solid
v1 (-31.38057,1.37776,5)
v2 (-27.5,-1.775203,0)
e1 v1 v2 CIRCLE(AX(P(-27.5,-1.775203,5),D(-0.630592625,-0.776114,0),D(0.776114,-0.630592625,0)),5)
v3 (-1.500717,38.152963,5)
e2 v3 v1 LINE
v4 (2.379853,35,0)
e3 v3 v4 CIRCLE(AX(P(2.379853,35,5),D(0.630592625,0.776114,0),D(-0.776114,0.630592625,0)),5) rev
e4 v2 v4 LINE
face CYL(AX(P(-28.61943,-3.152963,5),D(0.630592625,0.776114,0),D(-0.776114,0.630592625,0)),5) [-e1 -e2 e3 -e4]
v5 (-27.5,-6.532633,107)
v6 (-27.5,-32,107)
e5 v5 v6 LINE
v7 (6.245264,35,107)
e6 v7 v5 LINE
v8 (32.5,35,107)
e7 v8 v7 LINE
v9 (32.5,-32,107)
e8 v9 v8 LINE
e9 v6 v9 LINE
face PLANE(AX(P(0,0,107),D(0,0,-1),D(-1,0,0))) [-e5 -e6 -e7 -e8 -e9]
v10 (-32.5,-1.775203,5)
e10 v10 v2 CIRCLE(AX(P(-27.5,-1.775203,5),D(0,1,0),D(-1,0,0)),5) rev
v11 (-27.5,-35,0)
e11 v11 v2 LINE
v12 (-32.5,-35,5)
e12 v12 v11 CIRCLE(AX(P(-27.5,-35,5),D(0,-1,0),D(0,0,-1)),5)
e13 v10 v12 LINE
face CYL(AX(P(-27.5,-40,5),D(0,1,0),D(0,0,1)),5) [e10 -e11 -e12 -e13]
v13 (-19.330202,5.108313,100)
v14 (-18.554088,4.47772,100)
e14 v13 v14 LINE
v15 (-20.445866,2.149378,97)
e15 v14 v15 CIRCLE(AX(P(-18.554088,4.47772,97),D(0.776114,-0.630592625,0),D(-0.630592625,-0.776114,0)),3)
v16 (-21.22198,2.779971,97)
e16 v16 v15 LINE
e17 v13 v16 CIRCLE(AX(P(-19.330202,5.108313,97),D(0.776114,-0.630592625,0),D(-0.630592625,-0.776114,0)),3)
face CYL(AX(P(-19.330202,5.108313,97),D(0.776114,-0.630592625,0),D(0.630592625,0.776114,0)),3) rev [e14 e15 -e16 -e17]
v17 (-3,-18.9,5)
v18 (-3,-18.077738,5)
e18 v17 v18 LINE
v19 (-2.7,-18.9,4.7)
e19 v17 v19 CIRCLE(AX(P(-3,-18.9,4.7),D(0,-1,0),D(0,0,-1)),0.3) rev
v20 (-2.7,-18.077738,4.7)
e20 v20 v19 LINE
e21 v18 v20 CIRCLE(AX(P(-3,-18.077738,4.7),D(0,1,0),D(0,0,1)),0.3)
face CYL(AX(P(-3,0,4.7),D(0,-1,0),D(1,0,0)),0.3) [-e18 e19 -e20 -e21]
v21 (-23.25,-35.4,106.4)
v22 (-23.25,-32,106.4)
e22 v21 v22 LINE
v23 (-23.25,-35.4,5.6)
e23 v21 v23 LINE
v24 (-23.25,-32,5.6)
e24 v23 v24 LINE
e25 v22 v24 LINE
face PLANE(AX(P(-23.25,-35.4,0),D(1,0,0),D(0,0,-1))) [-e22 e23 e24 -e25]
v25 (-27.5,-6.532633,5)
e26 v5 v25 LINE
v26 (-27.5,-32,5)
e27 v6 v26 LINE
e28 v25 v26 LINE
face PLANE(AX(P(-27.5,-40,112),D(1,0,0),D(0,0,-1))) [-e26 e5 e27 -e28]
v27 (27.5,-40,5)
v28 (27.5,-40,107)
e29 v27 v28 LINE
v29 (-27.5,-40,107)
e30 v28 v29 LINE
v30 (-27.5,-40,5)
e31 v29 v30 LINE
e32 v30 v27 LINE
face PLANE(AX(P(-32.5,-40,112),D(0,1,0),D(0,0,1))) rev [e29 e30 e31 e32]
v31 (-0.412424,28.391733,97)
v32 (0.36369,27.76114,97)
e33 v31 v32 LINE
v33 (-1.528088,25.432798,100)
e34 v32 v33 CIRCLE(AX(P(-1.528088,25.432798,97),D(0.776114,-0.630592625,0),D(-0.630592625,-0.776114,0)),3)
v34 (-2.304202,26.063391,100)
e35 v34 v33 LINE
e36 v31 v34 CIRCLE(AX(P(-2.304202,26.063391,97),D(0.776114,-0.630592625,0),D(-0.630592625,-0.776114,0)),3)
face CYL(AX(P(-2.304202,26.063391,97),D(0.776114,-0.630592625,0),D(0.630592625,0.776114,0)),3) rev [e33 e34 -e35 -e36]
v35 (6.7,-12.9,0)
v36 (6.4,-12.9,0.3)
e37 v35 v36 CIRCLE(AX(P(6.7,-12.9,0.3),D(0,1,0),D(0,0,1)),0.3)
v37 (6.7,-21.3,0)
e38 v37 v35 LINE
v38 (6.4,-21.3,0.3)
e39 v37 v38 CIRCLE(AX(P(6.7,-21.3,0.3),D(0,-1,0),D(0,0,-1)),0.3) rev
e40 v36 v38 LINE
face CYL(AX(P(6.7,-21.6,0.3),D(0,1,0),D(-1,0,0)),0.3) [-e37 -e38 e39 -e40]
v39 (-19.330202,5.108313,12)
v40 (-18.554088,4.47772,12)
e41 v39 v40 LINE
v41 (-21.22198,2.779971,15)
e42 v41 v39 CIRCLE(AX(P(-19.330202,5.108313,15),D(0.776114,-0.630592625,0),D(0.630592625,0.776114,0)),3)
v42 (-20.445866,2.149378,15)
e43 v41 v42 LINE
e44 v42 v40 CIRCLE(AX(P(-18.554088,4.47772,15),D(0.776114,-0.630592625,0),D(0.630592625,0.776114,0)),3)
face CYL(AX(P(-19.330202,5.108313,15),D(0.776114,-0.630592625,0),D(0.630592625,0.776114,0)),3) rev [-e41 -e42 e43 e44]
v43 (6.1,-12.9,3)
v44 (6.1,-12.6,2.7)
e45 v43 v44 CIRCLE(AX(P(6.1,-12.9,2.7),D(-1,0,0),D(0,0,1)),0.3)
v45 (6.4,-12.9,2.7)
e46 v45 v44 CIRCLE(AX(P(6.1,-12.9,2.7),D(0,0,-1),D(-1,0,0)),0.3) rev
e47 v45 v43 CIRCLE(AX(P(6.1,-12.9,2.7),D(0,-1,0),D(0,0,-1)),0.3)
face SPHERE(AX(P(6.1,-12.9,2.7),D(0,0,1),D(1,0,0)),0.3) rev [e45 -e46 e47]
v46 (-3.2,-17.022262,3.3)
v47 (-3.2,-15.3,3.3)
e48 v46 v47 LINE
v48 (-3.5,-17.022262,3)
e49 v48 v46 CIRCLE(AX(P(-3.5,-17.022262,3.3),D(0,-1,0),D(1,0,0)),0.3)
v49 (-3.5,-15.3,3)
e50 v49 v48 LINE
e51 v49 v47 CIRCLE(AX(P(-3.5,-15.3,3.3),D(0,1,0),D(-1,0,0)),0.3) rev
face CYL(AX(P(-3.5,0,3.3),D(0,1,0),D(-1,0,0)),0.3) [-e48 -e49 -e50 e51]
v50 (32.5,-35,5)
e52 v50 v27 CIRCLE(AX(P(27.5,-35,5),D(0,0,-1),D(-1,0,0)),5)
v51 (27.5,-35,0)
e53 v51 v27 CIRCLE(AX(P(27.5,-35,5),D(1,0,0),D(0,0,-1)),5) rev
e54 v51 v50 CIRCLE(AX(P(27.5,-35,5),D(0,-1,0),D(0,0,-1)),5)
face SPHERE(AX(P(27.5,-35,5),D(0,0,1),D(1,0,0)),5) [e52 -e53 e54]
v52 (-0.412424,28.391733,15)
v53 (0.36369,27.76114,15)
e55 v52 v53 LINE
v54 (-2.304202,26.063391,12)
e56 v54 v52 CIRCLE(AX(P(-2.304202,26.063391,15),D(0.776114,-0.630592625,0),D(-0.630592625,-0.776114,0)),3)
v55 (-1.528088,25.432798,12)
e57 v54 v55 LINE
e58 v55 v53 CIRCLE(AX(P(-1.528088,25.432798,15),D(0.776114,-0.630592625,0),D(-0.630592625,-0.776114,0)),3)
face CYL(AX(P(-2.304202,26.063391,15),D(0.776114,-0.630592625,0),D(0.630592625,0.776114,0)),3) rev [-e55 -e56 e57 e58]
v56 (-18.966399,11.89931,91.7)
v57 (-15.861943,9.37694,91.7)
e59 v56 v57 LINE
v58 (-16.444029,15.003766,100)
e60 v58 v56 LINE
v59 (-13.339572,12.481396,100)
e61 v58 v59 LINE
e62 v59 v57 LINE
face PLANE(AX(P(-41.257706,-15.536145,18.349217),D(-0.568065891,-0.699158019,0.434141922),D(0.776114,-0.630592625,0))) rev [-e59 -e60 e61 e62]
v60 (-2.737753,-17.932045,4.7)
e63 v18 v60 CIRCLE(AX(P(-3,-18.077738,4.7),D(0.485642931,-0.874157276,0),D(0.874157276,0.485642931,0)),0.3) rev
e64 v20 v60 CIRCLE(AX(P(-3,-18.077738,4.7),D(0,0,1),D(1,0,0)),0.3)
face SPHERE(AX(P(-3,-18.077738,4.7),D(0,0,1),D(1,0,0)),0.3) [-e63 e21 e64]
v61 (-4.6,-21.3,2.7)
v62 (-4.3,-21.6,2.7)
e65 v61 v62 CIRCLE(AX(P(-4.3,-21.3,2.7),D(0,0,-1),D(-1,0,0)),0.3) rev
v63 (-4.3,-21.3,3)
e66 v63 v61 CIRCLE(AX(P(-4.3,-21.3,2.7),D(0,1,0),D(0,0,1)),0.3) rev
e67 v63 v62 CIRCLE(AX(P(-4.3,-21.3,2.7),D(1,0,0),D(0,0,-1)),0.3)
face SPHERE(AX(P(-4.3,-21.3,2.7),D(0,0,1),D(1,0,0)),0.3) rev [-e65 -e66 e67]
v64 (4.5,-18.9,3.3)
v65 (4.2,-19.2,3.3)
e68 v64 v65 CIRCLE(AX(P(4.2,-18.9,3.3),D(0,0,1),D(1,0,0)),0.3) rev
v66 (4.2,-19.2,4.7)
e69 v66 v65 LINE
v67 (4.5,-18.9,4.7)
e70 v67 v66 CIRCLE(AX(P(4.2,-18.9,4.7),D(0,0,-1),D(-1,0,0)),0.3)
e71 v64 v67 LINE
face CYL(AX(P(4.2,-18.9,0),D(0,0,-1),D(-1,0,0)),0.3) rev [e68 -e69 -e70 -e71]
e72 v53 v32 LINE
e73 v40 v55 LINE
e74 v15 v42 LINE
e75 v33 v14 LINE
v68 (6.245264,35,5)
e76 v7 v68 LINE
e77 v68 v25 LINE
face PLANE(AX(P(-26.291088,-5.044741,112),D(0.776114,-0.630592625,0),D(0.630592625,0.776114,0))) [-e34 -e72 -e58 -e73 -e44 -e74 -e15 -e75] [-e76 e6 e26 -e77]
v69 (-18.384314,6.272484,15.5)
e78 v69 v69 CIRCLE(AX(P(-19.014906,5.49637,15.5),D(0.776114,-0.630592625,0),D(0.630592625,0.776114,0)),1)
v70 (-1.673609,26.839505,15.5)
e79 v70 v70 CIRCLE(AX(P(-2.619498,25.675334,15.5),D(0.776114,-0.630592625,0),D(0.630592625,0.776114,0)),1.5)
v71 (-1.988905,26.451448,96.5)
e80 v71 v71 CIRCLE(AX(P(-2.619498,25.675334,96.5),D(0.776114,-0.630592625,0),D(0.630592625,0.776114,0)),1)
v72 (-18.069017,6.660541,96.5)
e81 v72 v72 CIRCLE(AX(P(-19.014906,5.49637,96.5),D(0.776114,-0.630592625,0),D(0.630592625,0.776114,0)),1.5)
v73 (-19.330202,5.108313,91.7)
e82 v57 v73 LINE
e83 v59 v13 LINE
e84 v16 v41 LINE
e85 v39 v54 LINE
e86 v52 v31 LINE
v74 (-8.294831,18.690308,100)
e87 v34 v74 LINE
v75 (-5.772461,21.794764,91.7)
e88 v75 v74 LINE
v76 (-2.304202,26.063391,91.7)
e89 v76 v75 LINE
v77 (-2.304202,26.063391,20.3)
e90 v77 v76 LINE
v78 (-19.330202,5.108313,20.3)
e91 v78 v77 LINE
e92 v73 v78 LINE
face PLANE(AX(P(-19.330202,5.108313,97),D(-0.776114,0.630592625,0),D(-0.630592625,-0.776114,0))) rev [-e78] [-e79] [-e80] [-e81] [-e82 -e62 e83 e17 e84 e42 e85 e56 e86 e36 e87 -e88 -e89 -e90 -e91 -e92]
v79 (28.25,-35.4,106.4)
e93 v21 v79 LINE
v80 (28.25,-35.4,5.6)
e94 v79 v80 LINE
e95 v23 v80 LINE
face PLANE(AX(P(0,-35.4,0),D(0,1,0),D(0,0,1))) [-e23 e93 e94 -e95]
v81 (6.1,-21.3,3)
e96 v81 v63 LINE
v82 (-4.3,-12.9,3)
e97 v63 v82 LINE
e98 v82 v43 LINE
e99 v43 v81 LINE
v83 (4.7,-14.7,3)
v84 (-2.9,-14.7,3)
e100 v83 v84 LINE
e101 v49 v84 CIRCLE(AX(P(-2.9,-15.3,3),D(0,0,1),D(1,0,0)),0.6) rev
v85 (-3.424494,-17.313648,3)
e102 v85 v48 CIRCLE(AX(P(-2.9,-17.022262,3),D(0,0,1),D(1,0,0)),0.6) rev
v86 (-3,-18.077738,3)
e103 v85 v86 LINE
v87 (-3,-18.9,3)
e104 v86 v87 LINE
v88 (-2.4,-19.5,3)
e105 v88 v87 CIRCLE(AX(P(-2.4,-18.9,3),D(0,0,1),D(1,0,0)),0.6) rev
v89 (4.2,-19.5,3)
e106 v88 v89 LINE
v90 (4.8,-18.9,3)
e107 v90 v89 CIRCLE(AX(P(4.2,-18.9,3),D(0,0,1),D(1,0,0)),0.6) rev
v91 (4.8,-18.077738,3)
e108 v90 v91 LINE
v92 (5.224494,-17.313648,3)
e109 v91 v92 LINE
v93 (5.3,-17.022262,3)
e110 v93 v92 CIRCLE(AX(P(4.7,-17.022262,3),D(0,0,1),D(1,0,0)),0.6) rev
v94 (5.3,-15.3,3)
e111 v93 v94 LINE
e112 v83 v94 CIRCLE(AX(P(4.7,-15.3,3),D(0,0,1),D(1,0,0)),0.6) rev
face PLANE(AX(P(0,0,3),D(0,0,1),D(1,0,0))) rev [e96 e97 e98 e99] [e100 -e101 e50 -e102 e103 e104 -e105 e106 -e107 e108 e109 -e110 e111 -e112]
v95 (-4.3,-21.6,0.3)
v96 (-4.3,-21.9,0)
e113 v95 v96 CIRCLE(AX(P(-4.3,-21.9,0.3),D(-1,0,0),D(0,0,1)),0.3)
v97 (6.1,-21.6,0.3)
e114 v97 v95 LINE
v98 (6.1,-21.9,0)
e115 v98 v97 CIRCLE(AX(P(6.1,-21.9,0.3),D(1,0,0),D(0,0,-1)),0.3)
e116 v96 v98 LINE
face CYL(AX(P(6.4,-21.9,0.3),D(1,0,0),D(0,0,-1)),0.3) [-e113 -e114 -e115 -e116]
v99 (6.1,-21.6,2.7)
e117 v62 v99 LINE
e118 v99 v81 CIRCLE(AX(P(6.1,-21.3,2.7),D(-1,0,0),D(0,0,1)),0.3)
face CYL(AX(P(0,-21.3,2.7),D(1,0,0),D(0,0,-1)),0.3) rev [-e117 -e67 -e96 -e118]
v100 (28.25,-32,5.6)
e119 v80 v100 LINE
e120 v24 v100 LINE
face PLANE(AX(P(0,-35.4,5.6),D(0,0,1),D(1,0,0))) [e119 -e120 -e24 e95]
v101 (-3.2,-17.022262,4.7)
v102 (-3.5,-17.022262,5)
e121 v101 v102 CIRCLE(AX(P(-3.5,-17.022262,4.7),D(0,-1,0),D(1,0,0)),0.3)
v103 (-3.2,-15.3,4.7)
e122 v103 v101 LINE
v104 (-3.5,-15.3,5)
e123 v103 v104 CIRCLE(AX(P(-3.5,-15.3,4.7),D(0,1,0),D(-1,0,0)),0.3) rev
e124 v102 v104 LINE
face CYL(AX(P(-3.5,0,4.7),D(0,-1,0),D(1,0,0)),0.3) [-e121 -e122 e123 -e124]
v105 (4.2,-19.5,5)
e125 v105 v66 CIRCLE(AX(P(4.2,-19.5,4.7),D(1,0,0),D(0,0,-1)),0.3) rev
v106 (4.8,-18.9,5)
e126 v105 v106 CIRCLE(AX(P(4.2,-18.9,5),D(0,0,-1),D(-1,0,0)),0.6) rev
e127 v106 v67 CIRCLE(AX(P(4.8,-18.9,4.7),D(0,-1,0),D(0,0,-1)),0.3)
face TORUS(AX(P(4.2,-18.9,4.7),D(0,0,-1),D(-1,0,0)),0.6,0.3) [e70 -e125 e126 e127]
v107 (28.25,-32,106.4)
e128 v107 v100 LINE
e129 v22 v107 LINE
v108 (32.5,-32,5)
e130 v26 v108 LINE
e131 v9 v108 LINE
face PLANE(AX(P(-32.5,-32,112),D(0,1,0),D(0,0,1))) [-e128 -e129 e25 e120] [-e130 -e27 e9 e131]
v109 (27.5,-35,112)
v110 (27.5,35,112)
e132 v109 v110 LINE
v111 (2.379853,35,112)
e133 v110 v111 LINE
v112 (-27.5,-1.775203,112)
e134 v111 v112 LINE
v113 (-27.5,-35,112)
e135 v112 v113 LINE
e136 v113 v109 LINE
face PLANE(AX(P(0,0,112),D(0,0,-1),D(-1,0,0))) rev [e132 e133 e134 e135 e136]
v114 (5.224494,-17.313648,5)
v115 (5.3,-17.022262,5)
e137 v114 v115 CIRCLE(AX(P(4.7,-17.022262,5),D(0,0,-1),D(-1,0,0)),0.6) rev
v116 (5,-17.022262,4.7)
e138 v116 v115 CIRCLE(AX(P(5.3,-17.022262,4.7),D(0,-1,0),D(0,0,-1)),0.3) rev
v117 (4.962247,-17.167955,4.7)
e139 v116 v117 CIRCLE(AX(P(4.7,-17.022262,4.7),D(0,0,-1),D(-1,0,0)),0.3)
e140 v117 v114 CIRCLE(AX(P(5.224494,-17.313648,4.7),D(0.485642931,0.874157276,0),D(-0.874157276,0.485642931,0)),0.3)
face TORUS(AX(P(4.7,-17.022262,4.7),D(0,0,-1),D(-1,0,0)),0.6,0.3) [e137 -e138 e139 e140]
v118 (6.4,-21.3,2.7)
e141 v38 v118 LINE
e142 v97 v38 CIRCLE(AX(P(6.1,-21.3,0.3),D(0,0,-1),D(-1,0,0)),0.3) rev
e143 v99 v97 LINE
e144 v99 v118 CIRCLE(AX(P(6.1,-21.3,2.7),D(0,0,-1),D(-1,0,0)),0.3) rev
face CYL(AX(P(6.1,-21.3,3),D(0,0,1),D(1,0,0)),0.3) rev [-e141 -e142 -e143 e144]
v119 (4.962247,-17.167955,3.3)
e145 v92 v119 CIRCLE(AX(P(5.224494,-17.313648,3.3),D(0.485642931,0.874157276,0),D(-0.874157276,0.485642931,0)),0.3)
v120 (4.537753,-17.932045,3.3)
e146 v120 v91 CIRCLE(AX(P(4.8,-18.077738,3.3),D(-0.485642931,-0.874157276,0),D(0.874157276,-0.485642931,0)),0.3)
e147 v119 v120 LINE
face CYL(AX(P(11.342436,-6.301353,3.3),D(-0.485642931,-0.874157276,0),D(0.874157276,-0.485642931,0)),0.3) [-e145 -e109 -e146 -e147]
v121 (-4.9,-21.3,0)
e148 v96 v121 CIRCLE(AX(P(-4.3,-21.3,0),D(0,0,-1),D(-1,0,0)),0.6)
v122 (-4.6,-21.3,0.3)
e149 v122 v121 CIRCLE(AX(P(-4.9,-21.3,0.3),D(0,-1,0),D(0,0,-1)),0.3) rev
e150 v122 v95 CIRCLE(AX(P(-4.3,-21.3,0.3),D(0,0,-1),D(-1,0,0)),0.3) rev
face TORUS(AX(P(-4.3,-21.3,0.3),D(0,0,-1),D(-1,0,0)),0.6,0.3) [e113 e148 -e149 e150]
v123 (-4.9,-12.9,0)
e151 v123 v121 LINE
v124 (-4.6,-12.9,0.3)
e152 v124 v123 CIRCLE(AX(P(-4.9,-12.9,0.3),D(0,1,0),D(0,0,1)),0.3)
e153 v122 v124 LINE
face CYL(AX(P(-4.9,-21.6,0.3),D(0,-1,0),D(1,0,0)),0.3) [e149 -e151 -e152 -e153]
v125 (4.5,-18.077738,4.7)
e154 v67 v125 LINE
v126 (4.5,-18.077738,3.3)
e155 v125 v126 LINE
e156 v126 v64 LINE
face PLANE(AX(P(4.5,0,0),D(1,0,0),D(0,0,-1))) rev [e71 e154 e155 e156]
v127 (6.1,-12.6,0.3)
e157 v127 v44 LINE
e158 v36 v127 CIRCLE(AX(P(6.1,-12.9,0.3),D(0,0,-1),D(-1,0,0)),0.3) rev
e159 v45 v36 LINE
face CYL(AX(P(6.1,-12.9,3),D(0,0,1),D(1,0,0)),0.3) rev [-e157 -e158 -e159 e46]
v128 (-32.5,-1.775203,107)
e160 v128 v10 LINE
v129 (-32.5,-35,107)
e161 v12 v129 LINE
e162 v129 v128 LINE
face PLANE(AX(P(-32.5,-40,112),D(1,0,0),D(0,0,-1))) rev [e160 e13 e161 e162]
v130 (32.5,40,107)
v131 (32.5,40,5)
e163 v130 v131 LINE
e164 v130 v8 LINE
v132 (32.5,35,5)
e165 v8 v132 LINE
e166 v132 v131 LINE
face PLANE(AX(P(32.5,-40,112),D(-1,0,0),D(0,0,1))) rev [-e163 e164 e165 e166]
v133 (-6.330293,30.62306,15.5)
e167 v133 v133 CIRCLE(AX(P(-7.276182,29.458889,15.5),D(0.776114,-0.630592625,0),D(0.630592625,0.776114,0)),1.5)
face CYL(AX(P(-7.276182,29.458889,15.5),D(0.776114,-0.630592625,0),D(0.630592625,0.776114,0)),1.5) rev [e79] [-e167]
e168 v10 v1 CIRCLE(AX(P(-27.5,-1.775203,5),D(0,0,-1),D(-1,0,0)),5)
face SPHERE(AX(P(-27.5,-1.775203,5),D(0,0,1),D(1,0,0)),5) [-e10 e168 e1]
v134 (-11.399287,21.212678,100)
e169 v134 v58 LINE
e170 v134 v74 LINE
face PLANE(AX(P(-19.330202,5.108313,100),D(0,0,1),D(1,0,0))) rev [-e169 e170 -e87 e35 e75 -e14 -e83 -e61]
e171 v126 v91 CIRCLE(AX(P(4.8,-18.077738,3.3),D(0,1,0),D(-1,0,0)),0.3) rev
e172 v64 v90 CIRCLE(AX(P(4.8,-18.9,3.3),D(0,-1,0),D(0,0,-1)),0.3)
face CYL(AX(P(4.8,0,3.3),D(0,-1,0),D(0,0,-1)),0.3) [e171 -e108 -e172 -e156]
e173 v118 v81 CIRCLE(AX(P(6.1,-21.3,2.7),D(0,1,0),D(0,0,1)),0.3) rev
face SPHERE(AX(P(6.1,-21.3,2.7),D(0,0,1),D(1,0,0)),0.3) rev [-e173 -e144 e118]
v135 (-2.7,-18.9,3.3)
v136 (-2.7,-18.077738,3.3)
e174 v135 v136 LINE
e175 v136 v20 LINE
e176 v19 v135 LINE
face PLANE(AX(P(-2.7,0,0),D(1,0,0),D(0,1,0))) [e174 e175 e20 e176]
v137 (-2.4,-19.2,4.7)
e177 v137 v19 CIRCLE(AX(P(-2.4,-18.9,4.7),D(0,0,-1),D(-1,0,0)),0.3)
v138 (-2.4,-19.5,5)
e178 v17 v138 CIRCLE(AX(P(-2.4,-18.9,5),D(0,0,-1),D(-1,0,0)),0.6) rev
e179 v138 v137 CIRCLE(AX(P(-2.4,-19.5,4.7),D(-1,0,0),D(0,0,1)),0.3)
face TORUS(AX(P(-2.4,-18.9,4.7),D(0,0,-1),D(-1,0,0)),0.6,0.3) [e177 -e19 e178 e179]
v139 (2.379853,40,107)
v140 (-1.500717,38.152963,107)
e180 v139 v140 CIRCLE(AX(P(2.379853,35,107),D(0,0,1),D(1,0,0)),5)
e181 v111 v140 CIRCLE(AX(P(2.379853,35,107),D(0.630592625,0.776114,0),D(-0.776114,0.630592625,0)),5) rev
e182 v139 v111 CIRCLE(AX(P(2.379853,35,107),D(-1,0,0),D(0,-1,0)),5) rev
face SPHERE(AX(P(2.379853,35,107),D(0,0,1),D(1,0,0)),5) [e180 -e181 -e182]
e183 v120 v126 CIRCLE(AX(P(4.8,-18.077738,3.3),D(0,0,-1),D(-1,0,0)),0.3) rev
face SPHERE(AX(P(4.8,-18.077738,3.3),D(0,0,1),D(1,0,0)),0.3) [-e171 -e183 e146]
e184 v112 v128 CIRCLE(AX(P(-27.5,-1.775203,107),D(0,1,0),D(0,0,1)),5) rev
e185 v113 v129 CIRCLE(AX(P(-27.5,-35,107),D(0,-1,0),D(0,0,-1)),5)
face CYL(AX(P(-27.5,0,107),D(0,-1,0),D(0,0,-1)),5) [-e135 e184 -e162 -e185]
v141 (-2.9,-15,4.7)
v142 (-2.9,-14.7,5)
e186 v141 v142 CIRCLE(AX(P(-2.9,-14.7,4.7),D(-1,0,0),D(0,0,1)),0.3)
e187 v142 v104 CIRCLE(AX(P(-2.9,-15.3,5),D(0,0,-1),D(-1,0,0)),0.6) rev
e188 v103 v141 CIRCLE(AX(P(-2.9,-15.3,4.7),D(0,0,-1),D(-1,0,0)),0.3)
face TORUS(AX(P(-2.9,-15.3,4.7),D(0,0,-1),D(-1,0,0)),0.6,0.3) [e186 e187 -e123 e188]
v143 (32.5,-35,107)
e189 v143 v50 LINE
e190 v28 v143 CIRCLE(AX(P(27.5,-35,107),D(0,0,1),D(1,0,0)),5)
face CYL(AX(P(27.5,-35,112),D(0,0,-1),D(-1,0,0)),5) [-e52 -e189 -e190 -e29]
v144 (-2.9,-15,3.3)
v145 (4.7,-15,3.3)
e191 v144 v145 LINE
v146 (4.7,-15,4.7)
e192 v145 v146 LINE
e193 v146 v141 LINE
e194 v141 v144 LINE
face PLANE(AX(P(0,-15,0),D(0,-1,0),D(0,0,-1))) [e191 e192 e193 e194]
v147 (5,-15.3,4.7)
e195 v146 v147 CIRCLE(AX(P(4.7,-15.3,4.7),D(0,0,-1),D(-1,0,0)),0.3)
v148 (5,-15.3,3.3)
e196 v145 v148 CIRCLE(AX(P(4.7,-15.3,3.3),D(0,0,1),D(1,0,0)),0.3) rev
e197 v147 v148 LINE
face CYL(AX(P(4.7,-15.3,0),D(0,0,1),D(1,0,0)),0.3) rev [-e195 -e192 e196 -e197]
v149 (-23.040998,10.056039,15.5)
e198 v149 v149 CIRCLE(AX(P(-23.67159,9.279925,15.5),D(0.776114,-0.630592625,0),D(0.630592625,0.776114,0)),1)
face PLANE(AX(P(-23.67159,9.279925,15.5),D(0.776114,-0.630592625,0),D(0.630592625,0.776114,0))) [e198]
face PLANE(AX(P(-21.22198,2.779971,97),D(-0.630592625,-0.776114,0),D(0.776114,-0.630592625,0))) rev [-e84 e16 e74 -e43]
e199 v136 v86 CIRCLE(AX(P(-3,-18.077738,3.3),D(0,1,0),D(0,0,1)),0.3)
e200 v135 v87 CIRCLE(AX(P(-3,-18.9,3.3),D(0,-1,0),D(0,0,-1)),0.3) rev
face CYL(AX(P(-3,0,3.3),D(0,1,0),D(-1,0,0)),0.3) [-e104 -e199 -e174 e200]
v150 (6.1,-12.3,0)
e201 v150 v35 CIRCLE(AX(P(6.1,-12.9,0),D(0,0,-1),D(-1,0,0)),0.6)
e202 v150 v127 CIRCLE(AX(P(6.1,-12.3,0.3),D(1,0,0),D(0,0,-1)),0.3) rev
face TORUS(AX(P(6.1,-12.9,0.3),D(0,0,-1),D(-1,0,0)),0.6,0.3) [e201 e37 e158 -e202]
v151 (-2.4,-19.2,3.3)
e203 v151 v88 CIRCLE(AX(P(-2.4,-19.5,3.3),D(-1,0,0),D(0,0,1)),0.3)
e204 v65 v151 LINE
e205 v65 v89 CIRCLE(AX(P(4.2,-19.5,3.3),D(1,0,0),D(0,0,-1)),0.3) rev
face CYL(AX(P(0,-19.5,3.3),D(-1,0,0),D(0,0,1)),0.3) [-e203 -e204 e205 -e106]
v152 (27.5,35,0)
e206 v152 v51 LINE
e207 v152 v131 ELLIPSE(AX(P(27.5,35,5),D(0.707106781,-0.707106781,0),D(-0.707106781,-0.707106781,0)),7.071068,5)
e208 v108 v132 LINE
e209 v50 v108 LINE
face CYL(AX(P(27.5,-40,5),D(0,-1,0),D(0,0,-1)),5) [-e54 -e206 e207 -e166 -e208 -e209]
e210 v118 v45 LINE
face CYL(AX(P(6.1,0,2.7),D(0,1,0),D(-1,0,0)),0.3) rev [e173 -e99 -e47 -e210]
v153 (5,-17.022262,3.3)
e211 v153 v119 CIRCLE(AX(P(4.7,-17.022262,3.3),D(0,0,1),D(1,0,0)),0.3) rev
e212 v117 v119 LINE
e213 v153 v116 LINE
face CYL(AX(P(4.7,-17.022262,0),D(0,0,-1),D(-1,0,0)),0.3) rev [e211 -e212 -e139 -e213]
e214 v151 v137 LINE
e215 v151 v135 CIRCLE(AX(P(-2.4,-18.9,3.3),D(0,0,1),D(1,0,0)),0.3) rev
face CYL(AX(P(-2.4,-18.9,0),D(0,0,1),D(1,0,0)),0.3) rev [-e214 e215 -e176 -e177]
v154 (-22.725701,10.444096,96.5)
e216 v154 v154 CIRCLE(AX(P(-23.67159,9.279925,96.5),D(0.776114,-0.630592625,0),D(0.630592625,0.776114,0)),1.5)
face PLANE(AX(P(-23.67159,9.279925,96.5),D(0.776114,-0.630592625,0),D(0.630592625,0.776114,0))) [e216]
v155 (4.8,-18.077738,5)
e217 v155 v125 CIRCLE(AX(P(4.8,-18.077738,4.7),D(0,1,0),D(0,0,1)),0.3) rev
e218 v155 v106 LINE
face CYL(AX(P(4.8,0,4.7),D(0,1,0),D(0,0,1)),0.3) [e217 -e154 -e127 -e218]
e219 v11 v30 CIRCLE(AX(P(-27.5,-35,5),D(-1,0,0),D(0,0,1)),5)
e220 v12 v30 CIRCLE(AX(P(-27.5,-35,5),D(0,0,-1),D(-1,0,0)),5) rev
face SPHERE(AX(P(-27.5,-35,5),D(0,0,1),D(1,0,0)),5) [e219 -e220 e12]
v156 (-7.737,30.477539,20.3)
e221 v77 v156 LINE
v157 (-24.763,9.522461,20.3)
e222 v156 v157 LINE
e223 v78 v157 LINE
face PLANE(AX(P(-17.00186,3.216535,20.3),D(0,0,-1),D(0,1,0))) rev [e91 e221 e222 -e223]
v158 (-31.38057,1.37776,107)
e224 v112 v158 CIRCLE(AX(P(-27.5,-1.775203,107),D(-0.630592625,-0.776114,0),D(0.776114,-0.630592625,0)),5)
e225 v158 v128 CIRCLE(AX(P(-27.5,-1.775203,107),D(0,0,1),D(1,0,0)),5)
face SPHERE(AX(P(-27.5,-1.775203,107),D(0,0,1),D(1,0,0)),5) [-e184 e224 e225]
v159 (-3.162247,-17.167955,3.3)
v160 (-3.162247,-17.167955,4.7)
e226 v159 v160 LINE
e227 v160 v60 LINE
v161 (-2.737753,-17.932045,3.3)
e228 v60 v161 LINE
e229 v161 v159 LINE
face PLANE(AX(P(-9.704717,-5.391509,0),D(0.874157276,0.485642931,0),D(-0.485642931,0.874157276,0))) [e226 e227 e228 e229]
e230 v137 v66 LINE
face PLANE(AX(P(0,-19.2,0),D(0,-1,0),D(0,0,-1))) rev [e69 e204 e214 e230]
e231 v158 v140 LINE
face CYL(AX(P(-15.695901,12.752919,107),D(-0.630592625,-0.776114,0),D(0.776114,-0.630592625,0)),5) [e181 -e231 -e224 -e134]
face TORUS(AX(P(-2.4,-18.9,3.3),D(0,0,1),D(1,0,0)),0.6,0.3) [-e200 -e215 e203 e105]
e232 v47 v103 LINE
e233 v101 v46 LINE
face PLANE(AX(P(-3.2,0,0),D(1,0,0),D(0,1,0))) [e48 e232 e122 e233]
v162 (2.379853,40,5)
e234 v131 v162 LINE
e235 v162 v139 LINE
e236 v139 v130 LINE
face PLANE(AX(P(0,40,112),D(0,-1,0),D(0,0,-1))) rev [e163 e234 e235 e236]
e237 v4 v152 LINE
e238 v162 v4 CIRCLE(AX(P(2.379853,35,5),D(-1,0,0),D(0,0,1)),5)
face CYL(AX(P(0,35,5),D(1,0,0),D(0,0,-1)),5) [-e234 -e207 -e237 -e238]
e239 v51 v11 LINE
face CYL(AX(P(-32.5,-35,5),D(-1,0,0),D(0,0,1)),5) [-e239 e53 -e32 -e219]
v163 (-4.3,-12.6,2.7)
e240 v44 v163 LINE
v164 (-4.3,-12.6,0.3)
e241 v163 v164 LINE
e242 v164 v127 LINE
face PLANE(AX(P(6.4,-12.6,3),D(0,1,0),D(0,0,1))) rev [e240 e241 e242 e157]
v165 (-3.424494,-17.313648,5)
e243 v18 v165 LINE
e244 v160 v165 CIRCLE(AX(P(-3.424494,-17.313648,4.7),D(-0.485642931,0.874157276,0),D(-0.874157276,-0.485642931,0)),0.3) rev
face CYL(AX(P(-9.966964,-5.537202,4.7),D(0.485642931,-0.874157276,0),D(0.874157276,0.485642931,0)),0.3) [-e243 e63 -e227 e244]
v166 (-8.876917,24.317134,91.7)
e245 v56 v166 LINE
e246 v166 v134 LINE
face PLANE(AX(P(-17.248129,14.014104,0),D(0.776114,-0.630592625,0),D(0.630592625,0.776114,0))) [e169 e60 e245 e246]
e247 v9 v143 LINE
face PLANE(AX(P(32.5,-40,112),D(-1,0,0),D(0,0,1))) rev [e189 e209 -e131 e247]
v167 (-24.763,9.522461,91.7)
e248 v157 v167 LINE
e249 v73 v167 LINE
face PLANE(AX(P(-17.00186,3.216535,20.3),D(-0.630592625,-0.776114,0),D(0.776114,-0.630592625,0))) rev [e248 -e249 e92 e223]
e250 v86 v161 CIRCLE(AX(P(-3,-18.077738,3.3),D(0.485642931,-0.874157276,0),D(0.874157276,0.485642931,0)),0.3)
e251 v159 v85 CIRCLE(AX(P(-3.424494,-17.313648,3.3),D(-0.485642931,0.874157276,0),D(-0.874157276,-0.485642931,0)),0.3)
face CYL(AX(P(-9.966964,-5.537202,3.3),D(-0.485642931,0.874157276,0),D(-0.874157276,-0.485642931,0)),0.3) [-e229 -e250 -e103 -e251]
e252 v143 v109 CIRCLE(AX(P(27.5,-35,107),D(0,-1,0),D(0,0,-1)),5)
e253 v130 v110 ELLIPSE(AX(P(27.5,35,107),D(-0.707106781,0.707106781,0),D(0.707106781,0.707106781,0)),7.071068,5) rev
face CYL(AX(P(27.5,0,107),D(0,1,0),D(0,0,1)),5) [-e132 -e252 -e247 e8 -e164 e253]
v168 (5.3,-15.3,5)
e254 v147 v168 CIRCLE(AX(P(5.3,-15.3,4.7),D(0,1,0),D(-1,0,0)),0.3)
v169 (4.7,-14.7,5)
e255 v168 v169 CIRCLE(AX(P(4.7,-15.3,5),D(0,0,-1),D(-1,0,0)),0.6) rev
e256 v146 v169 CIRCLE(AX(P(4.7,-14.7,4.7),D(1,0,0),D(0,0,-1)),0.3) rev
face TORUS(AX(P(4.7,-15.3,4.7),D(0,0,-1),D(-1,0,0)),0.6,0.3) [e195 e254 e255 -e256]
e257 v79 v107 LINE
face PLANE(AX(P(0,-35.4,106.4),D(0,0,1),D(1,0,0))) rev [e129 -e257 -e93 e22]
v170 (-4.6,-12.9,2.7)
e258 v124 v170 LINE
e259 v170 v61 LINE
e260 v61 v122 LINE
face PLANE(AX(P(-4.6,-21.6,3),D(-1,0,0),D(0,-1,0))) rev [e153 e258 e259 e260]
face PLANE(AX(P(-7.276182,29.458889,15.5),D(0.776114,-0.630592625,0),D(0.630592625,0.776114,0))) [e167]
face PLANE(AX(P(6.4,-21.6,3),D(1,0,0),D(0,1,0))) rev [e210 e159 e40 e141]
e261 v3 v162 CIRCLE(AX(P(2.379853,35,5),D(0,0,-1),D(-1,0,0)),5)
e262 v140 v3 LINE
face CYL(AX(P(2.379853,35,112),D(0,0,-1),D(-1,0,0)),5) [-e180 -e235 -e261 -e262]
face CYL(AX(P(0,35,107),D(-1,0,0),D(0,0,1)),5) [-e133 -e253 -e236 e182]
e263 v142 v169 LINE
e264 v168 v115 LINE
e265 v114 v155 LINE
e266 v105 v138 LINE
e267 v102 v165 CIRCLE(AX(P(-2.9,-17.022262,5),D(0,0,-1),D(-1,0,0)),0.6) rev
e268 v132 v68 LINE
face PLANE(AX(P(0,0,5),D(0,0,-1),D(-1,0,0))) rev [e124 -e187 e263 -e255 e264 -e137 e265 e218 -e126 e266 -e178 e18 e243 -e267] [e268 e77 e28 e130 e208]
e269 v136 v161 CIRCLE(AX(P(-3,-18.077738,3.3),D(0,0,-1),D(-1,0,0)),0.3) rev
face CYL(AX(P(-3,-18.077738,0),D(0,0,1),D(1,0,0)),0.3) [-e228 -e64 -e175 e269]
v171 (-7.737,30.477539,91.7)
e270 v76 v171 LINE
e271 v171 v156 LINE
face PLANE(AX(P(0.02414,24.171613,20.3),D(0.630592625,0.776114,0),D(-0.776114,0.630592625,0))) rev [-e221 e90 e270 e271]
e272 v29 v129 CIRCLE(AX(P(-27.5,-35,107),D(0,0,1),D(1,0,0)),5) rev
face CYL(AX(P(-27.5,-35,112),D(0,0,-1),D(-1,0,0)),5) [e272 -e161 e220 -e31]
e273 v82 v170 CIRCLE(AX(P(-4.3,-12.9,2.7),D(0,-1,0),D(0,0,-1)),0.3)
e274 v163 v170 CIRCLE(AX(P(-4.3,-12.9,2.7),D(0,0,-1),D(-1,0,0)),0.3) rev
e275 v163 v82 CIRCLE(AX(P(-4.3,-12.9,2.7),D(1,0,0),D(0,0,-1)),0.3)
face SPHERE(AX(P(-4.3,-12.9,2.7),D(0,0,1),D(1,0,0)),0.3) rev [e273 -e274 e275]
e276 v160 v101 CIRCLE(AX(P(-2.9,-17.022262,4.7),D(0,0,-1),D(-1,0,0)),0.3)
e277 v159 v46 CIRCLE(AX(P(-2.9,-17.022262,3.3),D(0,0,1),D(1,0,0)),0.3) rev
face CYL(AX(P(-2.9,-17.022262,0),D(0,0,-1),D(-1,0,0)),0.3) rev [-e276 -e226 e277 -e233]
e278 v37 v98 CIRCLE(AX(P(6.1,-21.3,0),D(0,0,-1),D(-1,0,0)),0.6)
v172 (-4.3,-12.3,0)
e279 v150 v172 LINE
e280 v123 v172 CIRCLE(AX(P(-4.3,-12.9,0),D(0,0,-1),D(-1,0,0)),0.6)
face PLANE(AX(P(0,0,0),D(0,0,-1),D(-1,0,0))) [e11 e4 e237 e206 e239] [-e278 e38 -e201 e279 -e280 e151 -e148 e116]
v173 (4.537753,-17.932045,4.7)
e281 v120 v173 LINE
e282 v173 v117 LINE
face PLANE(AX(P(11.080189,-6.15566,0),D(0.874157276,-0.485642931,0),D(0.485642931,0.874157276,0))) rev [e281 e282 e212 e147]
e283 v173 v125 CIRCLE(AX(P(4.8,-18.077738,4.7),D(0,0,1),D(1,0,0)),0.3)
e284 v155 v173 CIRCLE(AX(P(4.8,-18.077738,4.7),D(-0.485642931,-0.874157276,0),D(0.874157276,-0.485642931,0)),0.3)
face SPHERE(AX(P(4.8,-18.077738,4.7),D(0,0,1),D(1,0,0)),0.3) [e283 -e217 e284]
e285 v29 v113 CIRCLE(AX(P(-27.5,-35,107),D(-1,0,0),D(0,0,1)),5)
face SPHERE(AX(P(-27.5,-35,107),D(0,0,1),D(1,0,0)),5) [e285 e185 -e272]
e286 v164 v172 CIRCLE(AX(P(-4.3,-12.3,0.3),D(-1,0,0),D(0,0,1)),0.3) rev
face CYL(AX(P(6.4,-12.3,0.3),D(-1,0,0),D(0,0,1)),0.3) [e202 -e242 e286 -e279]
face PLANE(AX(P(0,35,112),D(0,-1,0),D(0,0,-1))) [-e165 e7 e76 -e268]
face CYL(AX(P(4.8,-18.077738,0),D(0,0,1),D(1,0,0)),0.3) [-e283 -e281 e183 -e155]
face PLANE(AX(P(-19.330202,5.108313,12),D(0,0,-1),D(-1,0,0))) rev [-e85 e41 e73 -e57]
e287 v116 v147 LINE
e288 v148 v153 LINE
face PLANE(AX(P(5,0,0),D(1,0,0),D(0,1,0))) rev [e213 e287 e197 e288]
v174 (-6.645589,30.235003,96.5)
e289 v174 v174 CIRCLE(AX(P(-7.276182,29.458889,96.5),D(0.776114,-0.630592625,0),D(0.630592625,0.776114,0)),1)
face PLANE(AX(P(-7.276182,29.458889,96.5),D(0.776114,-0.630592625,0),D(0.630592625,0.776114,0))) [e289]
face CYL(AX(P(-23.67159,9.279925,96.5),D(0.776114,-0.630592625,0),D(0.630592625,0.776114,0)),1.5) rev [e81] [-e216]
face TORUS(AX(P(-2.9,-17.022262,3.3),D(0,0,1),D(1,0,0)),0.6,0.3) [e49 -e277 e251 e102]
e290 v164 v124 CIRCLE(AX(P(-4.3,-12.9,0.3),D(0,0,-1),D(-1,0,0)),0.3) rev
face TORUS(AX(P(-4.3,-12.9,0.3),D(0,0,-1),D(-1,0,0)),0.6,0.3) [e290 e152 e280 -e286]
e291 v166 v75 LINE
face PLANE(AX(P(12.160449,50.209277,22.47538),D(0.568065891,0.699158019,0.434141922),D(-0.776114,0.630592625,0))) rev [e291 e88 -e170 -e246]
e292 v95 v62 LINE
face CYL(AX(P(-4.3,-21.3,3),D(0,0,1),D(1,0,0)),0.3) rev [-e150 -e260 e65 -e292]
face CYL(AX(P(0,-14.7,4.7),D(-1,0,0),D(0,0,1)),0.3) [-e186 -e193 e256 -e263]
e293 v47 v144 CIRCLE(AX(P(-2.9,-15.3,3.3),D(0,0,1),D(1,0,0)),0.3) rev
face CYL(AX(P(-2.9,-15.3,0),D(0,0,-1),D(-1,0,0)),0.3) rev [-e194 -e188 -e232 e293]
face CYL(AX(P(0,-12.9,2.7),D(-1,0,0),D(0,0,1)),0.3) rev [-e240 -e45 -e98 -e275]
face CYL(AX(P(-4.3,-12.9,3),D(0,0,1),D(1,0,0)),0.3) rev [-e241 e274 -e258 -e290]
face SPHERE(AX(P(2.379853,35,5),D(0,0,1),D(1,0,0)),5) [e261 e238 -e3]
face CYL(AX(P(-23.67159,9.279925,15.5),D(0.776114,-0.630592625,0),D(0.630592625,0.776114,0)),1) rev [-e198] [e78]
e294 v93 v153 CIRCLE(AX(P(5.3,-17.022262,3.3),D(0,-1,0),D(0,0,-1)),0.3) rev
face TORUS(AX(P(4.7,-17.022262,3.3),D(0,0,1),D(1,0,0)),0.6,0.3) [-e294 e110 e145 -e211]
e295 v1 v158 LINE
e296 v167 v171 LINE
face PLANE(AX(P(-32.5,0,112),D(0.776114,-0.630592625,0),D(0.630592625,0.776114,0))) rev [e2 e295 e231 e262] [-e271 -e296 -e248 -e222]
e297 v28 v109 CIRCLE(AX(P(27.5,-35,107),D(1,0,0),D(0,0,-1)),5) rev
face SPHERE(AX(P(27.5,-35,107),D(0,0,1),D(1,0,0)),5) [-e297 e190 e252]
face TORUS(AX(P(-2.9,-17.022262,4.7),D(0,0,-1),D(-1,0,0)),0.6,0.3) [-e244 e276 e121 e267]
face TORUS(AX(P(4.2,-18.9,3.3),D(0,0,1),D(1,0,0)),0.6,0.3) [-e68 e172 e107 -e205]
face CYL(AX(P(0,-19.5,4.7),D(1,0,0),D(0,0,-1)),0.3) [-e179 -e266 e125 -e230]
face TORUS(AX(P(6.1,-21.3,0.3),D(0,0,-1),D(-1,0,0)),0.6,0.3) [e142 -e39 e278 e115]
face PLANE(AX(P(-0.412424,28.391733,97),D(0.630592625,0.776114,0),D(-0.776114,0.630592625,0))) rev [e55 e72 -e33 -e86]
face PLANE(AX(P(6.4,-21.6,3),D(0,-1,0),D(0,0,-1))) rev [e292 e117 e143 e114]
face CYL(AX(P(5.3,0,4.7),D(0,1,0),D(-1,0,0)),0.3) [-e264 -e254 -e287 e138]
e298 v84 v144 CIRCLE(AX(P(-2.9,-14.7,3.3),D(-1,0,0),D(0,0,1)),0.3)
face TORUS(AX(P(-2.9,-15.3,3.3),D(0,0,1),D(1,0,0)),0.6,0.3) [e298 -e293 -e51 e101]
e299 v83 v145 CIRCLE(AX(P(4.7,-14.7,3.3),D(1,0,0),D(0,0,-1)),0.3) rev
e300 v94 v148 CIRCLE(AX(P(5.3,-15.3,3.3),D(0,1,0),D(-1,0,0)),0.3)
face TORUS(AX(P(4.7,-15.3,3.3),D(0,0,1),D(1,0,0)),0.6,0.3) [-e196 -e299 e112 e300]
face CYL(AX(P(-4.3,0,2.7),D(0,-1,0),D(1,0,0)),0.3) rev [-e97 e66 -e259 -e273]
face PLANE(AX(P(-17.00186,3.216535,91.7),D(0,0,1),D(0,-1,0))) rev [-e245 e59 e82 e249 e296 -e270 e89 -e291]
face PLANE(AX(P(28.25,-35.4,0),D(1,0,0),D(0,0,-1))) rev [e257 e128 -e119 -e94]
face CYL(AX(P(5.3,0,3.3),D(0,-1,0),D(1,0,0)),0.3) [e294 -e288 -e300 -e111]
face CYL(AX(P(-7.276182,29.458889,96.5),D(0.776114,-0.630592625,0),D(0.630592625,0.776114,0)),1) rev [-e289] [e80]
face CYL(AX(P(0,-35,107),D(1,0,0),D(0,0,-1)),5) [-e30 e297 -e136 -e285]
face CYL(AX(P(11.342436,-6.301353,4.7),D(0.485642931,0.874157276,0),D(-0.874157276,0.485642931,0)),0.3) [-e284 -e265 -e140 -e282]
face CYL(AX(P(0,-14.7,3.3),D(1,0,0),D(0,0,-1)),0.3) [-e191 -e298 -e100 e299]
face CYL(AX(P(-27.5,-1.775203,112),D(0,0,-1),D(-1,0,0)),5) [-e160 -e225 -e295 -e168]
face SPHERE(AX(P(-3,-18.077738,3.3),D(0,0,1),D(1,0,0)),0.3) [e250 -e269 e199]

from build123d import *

# Parameters (mm, degrees)
SALIENTE_EXTRUIR1_DEPTH = 112
VACIADO1_START          = 5
VACIADO1_DEPTH          = 102
REDONDEO1_R             = 5
CROQUIS2_W              = 71.4
CROQUIS2_H              = 27
CORTAR_EXTRUIR1_DEPTH   = 10
CORTAR_EXTRUIR2_DEPTH   = 1
CORTAR_EXTRUIR9_DEPTH   = 4
CROQUIS5_R              = 1
CROQUIS5_R_2            = 1.5
CORTAR_EXTRUIR3_DEPTH   = 6
CROQUIS6_W              = 51.5
CROQUIS6_H              = 100.8
CORTAR_EXTRUIR4_DEPTH   = 3.4
CROQUIS7_W              = 7.2
CROQUIS7_H              = 1.2
CORTAR_EXTRUIR6_DEPTH   = 119.765525301
CROQUIS14_W             = 11
CROQUIS14_H             = 9
CORTAR_EXTRUIR11_DEPTH  = 3
REDONDEO2_R             = 0.3


# Read off the part's stored shape, not the designer's step: Vaciado1
with BuildPart() as part:
    # Croquis1 → Saliente-Extruir1 (new body)
    with BuildSketch(Plane.XY):
        Polygon((-32.5, 0), (0, 40), (32.5, 40), (32.5, -40), (-32.5, -40), align=None)
    extrude(amount=SALIENTE_EXTRUIR1_DEPTH)

    # Vaciado1 outline → Vaciado1 (cut)
    with BuildSketch(Plane.XY.offset(VACIADO1_START)):
        Polygon((32.5, 35), (6.245264064, 35), (-27.5, -6.532632694), (-27.5, -32), (32.5, -32), align=None)
    extrude(amount=VACIADO1_DEPTH, mode=Mode.SUBTRACT)

    # Redondeo1
    redondeo1_edges = [part.edges().sort_by_distance(p)[0] for p in [
        (-16.25, 20, 112),
        (-32.5, -20, 112),
        (0, -40, 112),
        (32.5, 0, 112),
        (0, -40, 0),
        (-32.5, -20, 0),
        (-16.25, 20, 0),
        (16.25, 40, 0),
        (32.5, 0, 0),
        (16.25, 40, 112),
        (32.5, -40, 56),
        (-32.5, -40, 56),
        (-32.5, 0, 56),
        (0, 40, 56),
    ]]
    fillet(redondeo1_edges, radius=REDONDEO1_R - 0.0001)  # a hair under: the kernel refuses the full size

    # Croquis2 → Cortar-Extruir1 (cut)
    with BuildSketch(Plane(origin=(-19.576470588, 15.905882353, 0), x_dir=(0, 0, 1), z_dir=(-0.7761140001162655, 0.6305926250944658, 0))):
        with Locations((56, 5.275149845)):
            Rectangle(CROQUIS2_W, CROQUIS2_H)
    extrude(amount=-CORTAR_EXTRUIR1_DEPTH, mode=Mode.SUBTRACT)

    # Croquis3 → Cortar-Extruir2 (cut)
    with BuildSketch(Plane(origin=(-13.367558587, 10.861141352, 0), x_dir=(0, 0, -1), z_dir=(0.7761140001162655, -0.6305926250944659, 0))):
        with BuildLine():
            Line((-97, -11.224850155), (-15, -11.224850155))
            ThreePointArc((-15, -11.224850155), (-12.878679656, -10.346170499), (-12, -8.224850155))
            Line((-12, -8.224850155), (-12, 18.775149845))
            ThreePointArc((-12, 18.775149845), (-12.878679656, 20.896470188), (-15, 21.775149845))
            Line((-15, 21.775149845), (-97, 21.775149845))
            ThreePointArc((-97, 21.775149845), (-99.121320344, 20.896470188), (-100, 18.775149845))
            Line((-100, 18.775149845), (-100, -8.224850155))
            ThreePointArc((-100, -8.224850155), (-99.121320344, -10.346170499), (-97, -11.224850155))
        make_face()
    extrude(amount=-CORTAR_EXTRUIR2_DEPTH, mode=Mode.SUBTRACT)

    # Croquis10 → Cortar-Extruir9 (cut)
    with BuildSketch(Plane(origin=(-14.143672587, 11.491733977, 0), x_dir=(0, 0, -1), z_dir=(0.7761140001162654, -0.630592625094466, 0))):
        Polygon((-91.7, -2.724850155), (-91.7, 13.275149845), (-100, 9.275149845), (-100, 1.275149845), align=None)
    extrude(amount=-CORTAR_EXTRUIR9_DEPTH, mode=Mode.SUBTRACT)

    # Croquis5 → Cortar-Extruir3 (cut)
    with BuildSketch(Plane(origin=(-14.143672587, 11.491733977, 0), x_dir=(0, 0, -1), z_dir=(0.7761140001162655, -0.6305926250944659, 0))):
        with Locations(Location((-96.5, 18.275149845, 0), (0, 0, 90))):
            Circle(CROQUIS5_R)
        with Locations(Location((-96.5, -7.724850155, 0), (0, 0, 90))):
            Circle(CROQUIS5_R_2)
        with Locations(Location((-15.5, -7.724850155, 0), (0, 0, 90))):
            Circle(CROQUIS5_R)
        with Locations(Location((-15.5, 18.275149845, 0), (0, 0, 90))):
            Circle(CROQUIS5_R_2)
    extrude(amount=-CORTAR_EXTRUIR3_DEPTH, mode=Mode.SUBTRACT)

    # Croquis6 → Cortar-Extruir4 (cut)
    with BuildSketch(Plane(origin=(0, -32, 0), x_dir=(1, 0, 0), z_dir=(0, 1, 0))):
        with Locations((2.5, -56)):
            Rectangle(CROQUIS6_W, CROQUIS6_H)
    extrude(amount=-CORTAR_EXTRUIR4_DEPTH, mode=Mode.SUBTRACT)

    # Croquis7 → Cortar-Extruir6 (cut, through all)
    with BuildSketch(Plane.XY.offset(5)):
        Polygon((-2.7, -18), (4.5, -18), (5, -17.1), (5, -15), (-3.2, -15), (-3.2, -17.1), align=None)
        with Locations((0.9, -18.6)):
            Rectangle(CROQUIS7_W, CROQUIS7_H)
    extrude(amount=-CORTAR_EXTRUIR6_DEPTH, mode=Mode.SUBTRACT)

    # Croquis14 → Cortar-Extruir11 (cut)
    with BuildSketch(Plane(origin=(0, 0, 0), x_dir=(-1, 0, 0), z_dir=(0, 0, -1))):
        with Locations((-0.9, -17.1)):
            Rectangle(CROQUIS14_W, CROQUIS14_H)
    extrude(amount=-CORTAR_EXTRUIR11_DEPTH, mode=Mode.SUBTRACT)

    # Redondeo2
    redondeo2_edges = [part.edges().sort_by_distance(p)[0] for p in [
        (-2.95, -17.55, 5),
        (-3.2, -16.05, 5),
        (0.9, -15, 5),
        (-2.7, -18.6, 5),
        (0.9, -19.2, 5),
        (4.5, -18.6, 5),
        (4.75, -17.55, 5),
        (5, -16.05, 5),
        (-2.7, -19.2, 4),
        (-2.7, -18, 4),
        (-2.7, -18.6, 3),
        (4.5, -19.2, 4),
        (4.5, -18, 4),
        (5, -17.1, 4),
        (5, -15, 4),
        (-3.2, -15, 4),
        (-3.2, -17.1, 4),
        (-3.2, -16.05, 3),
        (-2.95, -17.55, 3),
        (0.9, -15, 3),
        (6.4, -17.1, 3),
        (6.4, -21.6, 1.5),
        (0.9, -12.6, 3),
        (6.4, -12.6, 1.5),
        (-4.6, -17.1, 3),
        (-4.6, -12.6, 1.5),
        (0.9, -21.6, 3),
        (-4.6, -21.6, 1.5),
        (5, -16.05, 3),
        (4.75, -17.55, 3),
        (4.5, -18.6, 3),
        (0.9, -19.2, 3),
        (6.4, -17.1, 0),
        (0.9, -21.6, 0),
        (-4.6, -17.1, 0),
        (0.9, -12.6, 0),
    ]]
    fillet(redondeo2_edges, radius=REDONDEO2_R)


solid = part.part
